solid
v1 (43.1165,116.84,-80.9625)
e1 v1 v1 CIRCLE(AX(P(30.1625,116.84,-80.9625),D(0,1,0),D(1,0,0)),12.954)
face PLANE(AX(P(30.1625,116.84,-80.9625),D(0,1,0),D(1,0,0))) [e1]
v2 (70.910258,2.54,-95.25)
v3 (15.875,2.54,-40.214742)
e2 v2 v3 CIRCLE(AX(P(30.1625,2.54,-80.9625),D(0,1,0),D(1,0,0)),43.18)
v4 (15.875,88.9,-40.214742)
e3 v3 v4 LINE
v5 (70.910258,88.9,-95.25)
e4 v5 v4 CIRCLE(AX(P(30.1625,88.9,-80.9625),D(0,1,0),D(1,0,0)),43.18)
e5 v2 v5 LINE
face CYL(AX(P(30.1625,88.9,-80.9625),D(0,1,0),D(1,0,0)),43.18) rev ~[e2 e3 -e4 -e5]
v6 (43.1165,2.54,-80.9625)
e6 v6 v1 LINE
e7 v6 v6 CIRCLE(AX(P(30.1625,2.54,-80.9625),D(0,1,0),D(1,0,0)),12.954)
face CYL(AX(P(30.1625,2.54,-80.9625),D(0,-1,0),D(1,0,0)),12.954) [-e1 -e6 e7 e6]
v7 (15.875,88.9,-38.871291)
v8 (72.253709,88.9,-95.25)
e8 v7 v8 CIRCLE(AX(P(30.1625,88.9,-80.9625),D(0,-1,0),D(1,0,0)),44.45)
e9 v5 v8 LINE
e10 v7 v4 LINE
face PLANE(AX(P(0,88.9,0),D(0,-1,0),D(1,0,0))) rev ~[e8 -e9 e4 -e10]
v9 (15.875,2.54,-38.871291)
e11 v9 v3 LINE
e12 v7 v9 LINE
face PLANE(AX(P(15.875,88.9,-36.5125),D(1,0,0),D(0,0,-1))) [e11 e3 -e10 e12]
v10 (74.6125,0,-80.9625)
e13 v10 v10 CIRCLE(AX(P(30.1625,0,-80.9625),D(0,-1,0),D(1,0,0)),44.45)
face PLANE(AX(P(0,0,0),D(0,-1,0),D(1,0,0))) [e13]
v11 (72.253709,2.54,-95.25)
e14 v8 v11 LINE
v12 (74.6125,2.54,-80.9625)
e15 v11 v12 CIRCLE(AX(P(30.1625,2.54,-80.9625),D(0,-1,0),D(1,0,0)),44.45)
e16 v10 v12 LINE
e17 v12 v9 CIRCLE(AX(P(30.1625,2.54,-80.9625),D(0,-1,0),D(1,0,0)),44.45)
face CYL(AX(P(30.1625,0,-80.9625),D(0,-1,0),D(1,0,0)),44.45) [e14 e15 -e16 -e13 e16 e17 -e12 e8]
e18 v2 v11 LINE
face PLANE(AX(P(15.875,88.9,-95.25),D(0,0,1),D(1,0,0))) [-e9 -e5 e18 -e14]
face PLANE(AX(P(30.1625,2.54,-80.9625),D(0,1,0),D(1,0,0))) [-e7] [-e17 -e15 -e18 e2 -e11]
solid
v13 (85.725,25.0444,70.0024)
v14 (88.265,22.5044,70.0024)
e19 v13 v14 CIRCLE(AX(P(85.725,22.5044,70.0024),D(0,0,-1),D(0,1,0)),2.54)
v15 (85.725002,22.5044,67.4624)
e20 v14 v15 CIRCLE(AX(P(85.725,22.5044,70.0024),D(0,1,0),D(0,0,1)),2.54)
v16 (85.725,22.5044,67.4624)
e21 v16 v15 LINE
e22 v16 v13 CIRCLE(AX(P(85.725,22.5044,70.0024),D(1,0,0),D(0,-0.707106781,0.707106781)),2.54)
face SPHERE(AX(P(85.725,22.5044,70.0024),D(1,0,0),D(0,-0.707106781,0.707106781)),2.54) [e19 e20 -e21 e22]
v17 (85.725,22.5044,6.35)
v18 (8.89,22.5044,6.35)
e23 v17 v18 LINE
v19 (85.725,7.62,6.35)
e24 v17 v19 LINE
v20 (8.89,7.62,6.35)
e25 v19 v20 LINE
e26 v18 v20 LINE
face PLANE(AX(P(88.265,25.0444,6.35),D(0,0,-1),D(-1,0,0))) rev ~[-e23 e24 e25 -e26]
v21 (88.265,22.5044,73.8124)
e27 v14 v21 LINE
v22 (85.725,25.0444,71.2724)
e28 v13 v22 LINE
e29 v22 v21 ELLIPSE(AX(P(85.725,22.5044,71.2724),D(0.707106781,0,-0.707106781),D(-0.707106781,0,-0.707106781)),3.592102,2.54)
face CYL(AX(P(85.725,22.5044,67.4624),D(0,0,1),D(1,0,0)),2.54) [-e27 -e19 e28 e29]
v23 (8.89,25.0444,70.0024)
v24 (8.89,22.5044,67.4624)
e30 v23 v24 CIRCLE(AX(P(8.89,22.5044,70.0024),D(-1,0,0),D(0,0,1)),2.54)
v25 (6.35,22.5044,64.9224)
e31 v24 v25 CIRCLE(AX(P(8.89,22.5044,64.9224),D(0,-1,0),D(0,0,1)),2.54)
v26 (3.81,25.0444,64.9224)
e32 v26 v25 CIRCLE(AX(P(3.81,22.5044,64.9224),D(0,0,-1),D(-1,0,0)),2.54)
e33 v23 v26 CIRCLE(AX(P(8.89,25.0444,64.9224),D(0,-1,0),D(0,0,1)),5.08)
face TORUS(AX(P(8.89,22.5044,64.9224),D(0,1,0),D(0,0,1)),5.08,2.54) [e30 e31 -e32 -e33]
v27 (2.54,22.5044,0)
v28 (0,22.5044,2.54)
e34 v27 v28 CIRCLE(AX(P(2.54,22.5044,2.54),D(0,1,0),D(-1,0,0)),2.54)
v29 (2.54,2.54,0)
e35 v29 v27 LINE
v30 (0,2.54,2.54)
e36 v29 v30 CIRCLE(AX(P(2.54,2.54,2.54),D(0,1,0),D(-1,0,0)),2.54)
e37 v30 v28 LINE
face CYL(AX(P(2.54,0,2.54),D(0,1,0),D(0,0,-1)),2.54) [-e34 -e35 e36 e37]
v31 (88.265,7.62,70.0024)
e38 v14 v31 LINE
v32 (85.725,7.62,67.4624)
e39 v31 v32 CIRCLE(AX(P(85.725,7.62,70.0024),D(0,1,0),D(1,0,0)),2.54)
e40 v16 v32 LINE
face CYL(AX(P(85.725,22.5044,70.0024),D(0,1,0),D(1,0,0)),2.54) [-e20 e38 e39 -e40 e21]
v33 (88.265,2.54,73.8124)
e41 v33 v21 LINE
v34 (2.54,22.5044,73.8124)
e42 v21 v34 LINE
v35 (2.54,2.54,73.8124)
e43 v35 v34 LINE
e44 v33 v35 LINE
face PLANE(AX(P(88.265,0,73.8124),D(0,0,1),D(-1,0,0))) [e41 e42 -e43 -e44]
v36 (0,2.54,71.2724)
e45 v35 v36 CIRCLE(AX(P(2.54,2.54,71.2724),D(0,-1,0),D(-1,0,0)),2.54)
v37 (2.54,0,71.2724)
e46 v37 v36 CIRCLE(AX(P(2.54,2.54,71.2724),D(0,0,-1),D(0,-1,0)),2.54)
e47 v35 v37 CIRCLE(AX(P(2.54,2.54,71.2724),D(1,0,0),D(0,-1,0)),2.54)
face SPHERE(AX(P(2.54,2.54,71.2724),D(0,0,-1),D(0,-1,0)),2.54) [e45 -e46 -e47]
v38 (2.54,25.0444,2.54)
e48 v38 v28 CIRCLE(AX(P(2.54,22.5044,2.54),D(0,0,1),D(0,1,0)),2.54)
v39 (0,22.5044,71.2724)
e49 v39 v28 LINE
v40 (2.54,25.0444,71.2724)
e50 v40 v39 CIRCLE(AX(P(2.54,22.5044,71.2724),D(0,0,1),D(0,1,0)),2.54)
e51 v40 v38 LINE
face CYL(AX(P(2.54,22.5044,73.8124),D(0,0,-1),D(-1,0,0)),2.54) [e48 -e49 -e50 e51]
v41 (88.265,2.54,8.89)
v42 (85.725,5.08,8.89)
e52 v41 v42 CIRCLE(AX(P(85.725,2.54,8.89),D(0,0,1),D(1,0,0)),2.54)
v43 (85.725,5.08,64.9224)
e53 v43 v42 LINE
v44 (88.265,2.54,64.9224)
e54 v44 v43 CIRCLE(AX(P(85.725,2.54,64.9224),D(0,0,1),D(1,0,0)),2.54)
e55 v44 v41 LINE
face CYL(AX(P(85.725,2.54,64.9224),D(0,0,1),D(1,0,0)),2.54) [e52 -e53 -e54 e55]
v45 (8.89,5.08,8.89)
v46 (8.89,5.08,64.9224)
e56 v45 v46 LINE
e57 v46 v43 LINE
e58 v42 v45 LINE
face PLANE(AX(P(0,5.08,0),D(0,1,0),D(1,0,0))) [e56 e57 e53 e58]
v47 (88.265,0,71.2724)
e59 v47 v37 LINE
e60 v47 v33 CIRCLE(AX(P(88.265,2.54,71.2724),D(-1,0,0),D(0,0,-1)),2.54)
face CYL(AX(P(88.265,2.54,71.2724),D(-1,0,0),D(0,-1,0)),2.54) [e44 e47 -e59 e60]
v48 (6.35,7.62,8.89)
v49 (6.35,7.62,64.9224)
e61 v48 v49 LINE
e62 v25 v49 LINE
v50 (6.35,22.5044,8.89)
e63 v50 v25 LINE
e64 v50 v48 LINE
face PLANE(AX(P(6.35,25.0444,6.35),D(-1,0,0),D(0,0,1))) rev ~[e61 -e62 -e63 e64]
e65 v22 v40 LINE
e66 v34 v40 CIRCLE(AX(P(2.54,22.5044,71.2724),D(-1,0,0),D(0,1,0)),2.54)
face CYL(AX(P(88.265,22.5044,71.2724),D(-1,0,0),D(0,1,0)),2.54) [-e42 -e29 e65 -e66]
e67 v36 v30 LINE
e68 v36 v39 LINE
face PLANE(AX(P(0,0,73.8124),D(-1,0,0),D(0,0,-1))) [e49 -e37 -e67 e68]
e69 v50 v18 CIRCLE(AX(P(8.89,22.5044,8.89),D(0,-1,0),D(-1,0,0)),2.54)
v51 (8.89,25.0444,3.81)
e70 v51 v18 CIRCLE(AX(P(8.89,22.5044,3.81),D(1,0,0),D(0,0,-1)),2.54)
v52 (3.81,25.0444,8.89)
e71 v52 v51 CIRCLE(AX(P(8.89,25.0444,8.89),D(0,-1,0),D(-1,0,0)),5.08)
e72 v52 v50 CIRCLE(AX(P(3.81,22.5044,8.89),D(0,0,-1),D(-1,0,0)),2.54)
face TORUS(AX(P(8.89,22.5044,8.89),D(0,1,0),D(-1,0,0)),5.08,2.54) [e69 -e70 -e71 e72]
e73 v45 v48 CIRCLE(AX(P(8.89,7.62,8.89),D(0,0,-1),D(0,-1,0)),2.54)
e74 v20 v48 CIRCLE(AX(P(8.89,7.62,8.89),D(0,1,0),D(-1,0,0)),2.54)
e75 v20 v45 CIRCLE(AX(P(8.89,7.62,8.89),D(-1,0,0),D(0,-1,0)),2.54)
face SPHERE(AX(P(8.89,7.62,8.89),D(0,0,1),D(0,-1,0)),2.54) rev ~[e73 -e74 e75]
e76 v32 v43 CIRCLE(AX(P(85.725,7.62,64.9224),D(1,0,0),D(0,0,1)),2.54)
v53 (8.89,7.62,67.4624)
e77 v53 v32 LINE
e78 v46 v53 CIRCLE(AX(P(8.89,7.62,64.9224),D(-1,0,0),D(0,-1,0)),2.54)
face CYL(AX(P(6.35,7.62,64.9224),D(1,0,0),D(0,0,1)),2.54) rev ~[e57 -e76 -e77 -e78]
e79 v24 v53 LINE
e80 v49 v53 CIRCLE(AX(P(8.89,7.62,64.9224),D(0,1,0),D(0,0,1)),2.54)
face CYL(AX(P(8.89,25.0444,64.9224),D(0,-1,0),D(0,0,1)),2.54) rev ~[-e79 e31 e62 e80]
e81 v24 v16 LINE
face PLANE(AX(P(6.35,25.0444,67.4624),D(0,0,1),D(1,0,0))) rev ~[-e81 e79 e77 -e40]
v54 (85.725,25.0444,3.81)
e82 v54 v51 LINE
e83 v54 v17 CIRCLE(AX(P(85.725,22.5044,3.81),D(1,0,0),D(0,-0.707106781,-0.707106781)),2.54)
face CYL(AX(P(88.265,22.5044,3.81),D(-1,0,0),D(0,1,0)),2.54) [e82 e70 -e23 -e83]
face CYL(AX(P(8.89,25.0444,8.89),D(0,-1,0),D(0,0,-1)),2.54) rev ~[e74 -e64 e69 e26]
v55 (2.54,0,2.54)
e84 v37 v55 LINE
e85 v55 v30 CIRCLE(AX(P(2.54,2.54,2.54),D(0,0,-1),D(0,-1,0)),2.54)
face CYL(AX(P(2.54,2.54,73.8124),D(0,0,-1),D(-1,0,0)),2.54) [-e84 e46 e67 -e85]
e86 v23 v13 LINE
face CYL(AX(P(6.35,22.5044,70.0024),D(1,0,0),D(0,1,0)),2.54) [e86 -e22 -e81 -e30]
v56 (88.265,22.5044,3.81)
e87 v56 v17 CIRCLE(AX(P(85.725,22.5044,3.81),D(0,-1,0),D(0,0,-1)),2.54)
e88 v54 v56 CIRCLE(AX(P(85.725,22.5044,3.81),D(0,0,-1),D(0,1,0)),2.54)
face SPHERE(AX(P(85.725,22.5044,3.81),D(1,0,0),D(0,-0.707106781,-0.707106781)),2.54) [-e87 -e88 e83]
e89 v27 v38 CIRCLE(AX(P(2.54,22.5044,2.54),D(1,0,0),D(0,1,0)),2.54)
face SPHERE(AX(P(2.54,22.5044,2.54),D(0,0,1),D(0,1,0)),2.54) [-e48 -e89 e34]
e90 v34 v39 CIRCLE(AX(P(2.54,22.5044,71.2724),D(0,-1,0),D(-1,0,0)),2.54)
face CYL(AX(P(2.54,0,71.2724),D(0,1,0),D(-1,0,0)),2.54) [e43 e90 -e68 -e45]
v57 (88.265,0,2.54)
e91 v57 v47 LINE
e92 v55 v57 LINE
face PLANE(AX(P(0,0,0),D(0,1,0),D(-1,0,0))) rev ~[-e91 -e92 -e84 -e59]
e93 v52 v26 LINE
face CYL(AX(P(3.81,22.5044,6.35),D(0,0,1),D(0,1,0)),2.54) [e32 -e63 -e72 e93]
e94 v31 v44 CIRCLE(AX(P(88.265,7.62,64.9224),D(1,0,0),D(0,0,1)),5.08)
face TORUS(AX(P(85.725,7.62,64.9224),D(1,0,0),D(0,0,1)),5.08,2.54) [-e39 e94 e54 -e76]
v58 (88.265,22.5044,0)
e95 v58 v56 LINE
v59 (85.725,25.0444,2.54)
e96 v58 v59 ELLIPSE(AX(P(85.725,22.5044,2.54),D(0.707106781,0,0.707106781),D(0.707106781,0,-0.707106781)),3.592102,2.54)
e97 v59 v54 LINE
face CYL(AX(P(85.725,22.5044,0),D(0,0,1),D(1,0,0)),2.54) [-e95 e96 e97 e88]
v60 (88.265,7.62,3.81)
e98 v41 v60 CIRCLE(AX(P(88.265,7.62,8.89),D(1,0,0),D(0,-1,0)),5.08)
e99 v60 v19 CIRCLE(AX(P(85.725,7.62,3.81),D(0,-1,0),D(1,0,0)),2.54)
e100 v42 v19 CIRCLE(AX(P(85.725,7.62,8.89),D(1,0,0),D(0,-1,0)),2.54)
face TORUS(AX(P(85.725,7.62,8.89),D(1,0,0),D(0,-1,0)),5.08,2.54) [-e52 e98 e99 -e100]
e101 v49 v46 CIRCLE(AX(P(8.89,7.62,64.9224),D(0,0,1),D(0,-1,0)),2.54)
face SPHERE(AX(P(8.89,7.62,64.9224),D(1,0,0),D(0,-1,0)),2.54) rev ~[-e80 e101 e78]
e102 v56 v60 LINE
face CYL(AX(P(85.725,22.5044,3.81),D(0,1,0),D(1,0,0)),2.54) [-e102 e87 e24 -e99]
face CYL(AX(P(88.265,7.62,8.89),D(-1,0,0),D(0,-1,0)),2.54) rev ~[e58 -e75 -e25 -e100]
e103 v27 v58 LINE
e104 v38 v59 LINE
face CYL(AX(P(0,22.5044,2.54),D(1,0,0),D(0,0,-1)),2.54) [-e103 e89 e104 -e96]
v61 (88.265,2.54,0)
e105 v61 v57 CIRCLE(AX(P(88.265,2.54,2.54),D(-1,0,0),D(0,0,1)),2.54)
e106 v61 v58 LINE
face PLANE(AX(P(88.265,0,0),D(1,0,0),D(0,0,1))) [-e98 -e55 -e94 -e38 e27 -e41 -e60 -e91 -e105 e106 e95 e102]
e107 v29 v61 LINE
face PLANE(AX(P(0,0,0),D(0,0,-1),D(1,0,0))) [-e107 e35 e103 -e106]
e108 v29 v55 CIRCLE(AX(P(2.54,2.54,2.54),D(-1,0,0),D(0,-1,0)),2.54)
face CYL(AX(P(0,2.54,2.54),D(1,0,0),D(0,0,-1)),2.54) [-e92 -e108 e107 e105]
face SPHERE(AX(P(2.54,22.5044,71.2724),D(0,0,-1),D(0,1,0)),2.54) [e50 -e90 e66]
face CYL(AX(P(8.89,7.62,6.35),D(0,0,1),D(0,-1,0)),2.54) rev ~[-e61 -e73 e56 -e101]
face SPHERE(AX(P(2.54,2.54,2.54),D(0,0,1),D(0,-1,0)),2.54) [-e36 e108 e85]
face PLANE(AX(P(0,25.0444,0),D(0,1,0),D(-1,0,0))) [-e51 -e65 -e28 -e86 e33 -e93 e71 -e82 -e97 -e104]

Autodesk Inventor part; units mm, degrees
ref_plane "YZ Plane" through (0, 0, 0) normal (1, 0, 0) x (0, 1, 0)
ref_plane "XZ Plane" through (0, 0, 0) normal (0, 1, 0) x (-1, 0, 0)
ref_plane "XY Plane" through (0, 0, 0) normal (0, 0, 1) x (1, 0, 0)
sketch "Sketch1" plane through (0, 0, 0) normal (0, 1, 0) x (-1, 0, 0)
  line L0 (0, 0) -> (-88.265, 0)
  line L1 (-88.265, 0) -> (-88.265, 73.8124)
  line L2 (-88.265, 73.8124) -> (0, 73.8124)
  line L3 (0, 73.8124) -> (0, 0)
  dimension "d0" = 88.265
  dimension "d1" = 73.8124
extrude "Extrusion1" add sketch "Sketch1" along normal blind 25.0444
sketch "Sketch2" plane through (0, 25.0444, 0) normal (0, 1, 0) x (1, 0, 0)
  line L0 (88.265, -6.35) -> (6.35, -6.35)
  line L1 (6.35, -6.35) -> (6.35, -67.4624)
  line L2 (6.35, -67.4624) -> (88.265, -67.4624)
  line L3 (88.265, -67.4624) -> (88.265, -6.35)
  line L4 (88.265, -73.8124) -> (88.265, 0) projected
  line L5 (0, 0) -> (0, -73.8124) projected
  line L6 (88.265, 0) -> (0, 0) projected
  line L7 (0, -73.8124) -> (88.265, -73.8124) projected
  dimension "d4" = 0
  dimension "d5" = 6.35
  dimension "d6" = 6.35
  dimension "d7" = 6.35
extrude "Extrusion2" cut sketch "Sketch2" against normal blind 19.9644 contours L3 L2 L1 L0
fillet "Fillet1" radius 2.54 18 edges at (47.3075, 5.08, 67.4624) (6.35, 5.08, 36.9062) (47.3075, 5.08, 6.35) (0, 0, 36.9062) (0, 25.0444, 36.9062) (44.1325, 0, 0) (44.1325, 25.0444, 0) (47.3075, 25.0444, 67.4624) (44.1325, 25.0444, 73.8124) (6.35, 25.0444, 36.9062) (88.265, 25.0444, 70.6374) (88.265, 25.0444, 3.175) (47.3075, 25.0444, 6.35) (44.1325, 0, 73.8124) (6.35, 15.0622, 6.35) (6.35, 15.0622, 67.4624) (0, 12.5222, 0) (0, 12.5222, 73.8124)
fillet "Fillet2" radius 2.54 7 edges at (88.265, 5.8239, 7.0939) (88.265, 5.08, 36.9062) (88.265, 5.8239, 66.7185) (88.265, 15.0622, 67.4624) (87.5211, 24.3005, 68.2063) (87.5211, 24.3005, 5.6061) (88.265, 15.0622, 6.35)
sketch "Sketch3" plane through (0, 0, 0) normal (0, -1, 0) x (1, 0, 0)
  circle A0 centre (30.1625, -80.9625) radius 44.45
  point P0 (0, 0)
  dimension "d12" = 88.9
extrude "Extrusion3" add sketch "Sketch3" against normal blind 88.9
sketch "Sketch4" plane through (30.1625, 88.9, -80.9625) normal (0, 1, 0) x (1, 0, 0)
  circle A0 centre (0, 0) radius 43.18
  point P0 (-30.1625, -80.9625)
  dimension "d15" = 86.36
extrude "Extrusion4" cut sketch "Sketch4" against normal blind 86.36
sketch "Sketch5" plane through (30.1625, 88.9, -80.9625) normal (0, 1, 0) x (1, 0, 0)
  line L0 (44.45, 0) -> (44.45, -44.45)
  line L1 (44.45, -44.45) -> (0, -44.45)
  line L2 (44.45, -44.45) -> (-14.2875, -44.45)
  line L3 (-14.2875, -44.45) -> (-14.2875, 14.2875)
  line L4 (-14.2875, 14.2875) -> (44.45, 14.2875)
  line L5 (44.45, 14.2875) -> (44.45, -44.45)
  point P0 (-30.1625, -80.9625)
extrude "Extrusion5" cut sketch "Sketch5" against normal blind 86.36
sketch "Sketch6" plane through (30.1625, 2.54, -80.9625) normal (0, 1, 0) x (1, 0, 0)
  circle A0 centre (0, 0) radius 12.954
  point P0 (-30.1625, -80.9625)
  dimension "d20" = 25.908
extrude "Extrusion6" add sketch "Sketch6" along normal blind 114.3
sketch "Sketch7" plane through (6.35, 7.62, 64.9224) normal (1, 0, 0) x (0, 0, -1)
  circle A0 centre (146.05, 102.87) radius 2.54
  line L0 (158.8389, 109.22) -> (132.9309, 109.22) projected
  point P0 (64.9224, -7.62)
  dimension "d23" = 5.08
  dimension "d24" = 6.35
properties part number "Nicole's Ideas"
